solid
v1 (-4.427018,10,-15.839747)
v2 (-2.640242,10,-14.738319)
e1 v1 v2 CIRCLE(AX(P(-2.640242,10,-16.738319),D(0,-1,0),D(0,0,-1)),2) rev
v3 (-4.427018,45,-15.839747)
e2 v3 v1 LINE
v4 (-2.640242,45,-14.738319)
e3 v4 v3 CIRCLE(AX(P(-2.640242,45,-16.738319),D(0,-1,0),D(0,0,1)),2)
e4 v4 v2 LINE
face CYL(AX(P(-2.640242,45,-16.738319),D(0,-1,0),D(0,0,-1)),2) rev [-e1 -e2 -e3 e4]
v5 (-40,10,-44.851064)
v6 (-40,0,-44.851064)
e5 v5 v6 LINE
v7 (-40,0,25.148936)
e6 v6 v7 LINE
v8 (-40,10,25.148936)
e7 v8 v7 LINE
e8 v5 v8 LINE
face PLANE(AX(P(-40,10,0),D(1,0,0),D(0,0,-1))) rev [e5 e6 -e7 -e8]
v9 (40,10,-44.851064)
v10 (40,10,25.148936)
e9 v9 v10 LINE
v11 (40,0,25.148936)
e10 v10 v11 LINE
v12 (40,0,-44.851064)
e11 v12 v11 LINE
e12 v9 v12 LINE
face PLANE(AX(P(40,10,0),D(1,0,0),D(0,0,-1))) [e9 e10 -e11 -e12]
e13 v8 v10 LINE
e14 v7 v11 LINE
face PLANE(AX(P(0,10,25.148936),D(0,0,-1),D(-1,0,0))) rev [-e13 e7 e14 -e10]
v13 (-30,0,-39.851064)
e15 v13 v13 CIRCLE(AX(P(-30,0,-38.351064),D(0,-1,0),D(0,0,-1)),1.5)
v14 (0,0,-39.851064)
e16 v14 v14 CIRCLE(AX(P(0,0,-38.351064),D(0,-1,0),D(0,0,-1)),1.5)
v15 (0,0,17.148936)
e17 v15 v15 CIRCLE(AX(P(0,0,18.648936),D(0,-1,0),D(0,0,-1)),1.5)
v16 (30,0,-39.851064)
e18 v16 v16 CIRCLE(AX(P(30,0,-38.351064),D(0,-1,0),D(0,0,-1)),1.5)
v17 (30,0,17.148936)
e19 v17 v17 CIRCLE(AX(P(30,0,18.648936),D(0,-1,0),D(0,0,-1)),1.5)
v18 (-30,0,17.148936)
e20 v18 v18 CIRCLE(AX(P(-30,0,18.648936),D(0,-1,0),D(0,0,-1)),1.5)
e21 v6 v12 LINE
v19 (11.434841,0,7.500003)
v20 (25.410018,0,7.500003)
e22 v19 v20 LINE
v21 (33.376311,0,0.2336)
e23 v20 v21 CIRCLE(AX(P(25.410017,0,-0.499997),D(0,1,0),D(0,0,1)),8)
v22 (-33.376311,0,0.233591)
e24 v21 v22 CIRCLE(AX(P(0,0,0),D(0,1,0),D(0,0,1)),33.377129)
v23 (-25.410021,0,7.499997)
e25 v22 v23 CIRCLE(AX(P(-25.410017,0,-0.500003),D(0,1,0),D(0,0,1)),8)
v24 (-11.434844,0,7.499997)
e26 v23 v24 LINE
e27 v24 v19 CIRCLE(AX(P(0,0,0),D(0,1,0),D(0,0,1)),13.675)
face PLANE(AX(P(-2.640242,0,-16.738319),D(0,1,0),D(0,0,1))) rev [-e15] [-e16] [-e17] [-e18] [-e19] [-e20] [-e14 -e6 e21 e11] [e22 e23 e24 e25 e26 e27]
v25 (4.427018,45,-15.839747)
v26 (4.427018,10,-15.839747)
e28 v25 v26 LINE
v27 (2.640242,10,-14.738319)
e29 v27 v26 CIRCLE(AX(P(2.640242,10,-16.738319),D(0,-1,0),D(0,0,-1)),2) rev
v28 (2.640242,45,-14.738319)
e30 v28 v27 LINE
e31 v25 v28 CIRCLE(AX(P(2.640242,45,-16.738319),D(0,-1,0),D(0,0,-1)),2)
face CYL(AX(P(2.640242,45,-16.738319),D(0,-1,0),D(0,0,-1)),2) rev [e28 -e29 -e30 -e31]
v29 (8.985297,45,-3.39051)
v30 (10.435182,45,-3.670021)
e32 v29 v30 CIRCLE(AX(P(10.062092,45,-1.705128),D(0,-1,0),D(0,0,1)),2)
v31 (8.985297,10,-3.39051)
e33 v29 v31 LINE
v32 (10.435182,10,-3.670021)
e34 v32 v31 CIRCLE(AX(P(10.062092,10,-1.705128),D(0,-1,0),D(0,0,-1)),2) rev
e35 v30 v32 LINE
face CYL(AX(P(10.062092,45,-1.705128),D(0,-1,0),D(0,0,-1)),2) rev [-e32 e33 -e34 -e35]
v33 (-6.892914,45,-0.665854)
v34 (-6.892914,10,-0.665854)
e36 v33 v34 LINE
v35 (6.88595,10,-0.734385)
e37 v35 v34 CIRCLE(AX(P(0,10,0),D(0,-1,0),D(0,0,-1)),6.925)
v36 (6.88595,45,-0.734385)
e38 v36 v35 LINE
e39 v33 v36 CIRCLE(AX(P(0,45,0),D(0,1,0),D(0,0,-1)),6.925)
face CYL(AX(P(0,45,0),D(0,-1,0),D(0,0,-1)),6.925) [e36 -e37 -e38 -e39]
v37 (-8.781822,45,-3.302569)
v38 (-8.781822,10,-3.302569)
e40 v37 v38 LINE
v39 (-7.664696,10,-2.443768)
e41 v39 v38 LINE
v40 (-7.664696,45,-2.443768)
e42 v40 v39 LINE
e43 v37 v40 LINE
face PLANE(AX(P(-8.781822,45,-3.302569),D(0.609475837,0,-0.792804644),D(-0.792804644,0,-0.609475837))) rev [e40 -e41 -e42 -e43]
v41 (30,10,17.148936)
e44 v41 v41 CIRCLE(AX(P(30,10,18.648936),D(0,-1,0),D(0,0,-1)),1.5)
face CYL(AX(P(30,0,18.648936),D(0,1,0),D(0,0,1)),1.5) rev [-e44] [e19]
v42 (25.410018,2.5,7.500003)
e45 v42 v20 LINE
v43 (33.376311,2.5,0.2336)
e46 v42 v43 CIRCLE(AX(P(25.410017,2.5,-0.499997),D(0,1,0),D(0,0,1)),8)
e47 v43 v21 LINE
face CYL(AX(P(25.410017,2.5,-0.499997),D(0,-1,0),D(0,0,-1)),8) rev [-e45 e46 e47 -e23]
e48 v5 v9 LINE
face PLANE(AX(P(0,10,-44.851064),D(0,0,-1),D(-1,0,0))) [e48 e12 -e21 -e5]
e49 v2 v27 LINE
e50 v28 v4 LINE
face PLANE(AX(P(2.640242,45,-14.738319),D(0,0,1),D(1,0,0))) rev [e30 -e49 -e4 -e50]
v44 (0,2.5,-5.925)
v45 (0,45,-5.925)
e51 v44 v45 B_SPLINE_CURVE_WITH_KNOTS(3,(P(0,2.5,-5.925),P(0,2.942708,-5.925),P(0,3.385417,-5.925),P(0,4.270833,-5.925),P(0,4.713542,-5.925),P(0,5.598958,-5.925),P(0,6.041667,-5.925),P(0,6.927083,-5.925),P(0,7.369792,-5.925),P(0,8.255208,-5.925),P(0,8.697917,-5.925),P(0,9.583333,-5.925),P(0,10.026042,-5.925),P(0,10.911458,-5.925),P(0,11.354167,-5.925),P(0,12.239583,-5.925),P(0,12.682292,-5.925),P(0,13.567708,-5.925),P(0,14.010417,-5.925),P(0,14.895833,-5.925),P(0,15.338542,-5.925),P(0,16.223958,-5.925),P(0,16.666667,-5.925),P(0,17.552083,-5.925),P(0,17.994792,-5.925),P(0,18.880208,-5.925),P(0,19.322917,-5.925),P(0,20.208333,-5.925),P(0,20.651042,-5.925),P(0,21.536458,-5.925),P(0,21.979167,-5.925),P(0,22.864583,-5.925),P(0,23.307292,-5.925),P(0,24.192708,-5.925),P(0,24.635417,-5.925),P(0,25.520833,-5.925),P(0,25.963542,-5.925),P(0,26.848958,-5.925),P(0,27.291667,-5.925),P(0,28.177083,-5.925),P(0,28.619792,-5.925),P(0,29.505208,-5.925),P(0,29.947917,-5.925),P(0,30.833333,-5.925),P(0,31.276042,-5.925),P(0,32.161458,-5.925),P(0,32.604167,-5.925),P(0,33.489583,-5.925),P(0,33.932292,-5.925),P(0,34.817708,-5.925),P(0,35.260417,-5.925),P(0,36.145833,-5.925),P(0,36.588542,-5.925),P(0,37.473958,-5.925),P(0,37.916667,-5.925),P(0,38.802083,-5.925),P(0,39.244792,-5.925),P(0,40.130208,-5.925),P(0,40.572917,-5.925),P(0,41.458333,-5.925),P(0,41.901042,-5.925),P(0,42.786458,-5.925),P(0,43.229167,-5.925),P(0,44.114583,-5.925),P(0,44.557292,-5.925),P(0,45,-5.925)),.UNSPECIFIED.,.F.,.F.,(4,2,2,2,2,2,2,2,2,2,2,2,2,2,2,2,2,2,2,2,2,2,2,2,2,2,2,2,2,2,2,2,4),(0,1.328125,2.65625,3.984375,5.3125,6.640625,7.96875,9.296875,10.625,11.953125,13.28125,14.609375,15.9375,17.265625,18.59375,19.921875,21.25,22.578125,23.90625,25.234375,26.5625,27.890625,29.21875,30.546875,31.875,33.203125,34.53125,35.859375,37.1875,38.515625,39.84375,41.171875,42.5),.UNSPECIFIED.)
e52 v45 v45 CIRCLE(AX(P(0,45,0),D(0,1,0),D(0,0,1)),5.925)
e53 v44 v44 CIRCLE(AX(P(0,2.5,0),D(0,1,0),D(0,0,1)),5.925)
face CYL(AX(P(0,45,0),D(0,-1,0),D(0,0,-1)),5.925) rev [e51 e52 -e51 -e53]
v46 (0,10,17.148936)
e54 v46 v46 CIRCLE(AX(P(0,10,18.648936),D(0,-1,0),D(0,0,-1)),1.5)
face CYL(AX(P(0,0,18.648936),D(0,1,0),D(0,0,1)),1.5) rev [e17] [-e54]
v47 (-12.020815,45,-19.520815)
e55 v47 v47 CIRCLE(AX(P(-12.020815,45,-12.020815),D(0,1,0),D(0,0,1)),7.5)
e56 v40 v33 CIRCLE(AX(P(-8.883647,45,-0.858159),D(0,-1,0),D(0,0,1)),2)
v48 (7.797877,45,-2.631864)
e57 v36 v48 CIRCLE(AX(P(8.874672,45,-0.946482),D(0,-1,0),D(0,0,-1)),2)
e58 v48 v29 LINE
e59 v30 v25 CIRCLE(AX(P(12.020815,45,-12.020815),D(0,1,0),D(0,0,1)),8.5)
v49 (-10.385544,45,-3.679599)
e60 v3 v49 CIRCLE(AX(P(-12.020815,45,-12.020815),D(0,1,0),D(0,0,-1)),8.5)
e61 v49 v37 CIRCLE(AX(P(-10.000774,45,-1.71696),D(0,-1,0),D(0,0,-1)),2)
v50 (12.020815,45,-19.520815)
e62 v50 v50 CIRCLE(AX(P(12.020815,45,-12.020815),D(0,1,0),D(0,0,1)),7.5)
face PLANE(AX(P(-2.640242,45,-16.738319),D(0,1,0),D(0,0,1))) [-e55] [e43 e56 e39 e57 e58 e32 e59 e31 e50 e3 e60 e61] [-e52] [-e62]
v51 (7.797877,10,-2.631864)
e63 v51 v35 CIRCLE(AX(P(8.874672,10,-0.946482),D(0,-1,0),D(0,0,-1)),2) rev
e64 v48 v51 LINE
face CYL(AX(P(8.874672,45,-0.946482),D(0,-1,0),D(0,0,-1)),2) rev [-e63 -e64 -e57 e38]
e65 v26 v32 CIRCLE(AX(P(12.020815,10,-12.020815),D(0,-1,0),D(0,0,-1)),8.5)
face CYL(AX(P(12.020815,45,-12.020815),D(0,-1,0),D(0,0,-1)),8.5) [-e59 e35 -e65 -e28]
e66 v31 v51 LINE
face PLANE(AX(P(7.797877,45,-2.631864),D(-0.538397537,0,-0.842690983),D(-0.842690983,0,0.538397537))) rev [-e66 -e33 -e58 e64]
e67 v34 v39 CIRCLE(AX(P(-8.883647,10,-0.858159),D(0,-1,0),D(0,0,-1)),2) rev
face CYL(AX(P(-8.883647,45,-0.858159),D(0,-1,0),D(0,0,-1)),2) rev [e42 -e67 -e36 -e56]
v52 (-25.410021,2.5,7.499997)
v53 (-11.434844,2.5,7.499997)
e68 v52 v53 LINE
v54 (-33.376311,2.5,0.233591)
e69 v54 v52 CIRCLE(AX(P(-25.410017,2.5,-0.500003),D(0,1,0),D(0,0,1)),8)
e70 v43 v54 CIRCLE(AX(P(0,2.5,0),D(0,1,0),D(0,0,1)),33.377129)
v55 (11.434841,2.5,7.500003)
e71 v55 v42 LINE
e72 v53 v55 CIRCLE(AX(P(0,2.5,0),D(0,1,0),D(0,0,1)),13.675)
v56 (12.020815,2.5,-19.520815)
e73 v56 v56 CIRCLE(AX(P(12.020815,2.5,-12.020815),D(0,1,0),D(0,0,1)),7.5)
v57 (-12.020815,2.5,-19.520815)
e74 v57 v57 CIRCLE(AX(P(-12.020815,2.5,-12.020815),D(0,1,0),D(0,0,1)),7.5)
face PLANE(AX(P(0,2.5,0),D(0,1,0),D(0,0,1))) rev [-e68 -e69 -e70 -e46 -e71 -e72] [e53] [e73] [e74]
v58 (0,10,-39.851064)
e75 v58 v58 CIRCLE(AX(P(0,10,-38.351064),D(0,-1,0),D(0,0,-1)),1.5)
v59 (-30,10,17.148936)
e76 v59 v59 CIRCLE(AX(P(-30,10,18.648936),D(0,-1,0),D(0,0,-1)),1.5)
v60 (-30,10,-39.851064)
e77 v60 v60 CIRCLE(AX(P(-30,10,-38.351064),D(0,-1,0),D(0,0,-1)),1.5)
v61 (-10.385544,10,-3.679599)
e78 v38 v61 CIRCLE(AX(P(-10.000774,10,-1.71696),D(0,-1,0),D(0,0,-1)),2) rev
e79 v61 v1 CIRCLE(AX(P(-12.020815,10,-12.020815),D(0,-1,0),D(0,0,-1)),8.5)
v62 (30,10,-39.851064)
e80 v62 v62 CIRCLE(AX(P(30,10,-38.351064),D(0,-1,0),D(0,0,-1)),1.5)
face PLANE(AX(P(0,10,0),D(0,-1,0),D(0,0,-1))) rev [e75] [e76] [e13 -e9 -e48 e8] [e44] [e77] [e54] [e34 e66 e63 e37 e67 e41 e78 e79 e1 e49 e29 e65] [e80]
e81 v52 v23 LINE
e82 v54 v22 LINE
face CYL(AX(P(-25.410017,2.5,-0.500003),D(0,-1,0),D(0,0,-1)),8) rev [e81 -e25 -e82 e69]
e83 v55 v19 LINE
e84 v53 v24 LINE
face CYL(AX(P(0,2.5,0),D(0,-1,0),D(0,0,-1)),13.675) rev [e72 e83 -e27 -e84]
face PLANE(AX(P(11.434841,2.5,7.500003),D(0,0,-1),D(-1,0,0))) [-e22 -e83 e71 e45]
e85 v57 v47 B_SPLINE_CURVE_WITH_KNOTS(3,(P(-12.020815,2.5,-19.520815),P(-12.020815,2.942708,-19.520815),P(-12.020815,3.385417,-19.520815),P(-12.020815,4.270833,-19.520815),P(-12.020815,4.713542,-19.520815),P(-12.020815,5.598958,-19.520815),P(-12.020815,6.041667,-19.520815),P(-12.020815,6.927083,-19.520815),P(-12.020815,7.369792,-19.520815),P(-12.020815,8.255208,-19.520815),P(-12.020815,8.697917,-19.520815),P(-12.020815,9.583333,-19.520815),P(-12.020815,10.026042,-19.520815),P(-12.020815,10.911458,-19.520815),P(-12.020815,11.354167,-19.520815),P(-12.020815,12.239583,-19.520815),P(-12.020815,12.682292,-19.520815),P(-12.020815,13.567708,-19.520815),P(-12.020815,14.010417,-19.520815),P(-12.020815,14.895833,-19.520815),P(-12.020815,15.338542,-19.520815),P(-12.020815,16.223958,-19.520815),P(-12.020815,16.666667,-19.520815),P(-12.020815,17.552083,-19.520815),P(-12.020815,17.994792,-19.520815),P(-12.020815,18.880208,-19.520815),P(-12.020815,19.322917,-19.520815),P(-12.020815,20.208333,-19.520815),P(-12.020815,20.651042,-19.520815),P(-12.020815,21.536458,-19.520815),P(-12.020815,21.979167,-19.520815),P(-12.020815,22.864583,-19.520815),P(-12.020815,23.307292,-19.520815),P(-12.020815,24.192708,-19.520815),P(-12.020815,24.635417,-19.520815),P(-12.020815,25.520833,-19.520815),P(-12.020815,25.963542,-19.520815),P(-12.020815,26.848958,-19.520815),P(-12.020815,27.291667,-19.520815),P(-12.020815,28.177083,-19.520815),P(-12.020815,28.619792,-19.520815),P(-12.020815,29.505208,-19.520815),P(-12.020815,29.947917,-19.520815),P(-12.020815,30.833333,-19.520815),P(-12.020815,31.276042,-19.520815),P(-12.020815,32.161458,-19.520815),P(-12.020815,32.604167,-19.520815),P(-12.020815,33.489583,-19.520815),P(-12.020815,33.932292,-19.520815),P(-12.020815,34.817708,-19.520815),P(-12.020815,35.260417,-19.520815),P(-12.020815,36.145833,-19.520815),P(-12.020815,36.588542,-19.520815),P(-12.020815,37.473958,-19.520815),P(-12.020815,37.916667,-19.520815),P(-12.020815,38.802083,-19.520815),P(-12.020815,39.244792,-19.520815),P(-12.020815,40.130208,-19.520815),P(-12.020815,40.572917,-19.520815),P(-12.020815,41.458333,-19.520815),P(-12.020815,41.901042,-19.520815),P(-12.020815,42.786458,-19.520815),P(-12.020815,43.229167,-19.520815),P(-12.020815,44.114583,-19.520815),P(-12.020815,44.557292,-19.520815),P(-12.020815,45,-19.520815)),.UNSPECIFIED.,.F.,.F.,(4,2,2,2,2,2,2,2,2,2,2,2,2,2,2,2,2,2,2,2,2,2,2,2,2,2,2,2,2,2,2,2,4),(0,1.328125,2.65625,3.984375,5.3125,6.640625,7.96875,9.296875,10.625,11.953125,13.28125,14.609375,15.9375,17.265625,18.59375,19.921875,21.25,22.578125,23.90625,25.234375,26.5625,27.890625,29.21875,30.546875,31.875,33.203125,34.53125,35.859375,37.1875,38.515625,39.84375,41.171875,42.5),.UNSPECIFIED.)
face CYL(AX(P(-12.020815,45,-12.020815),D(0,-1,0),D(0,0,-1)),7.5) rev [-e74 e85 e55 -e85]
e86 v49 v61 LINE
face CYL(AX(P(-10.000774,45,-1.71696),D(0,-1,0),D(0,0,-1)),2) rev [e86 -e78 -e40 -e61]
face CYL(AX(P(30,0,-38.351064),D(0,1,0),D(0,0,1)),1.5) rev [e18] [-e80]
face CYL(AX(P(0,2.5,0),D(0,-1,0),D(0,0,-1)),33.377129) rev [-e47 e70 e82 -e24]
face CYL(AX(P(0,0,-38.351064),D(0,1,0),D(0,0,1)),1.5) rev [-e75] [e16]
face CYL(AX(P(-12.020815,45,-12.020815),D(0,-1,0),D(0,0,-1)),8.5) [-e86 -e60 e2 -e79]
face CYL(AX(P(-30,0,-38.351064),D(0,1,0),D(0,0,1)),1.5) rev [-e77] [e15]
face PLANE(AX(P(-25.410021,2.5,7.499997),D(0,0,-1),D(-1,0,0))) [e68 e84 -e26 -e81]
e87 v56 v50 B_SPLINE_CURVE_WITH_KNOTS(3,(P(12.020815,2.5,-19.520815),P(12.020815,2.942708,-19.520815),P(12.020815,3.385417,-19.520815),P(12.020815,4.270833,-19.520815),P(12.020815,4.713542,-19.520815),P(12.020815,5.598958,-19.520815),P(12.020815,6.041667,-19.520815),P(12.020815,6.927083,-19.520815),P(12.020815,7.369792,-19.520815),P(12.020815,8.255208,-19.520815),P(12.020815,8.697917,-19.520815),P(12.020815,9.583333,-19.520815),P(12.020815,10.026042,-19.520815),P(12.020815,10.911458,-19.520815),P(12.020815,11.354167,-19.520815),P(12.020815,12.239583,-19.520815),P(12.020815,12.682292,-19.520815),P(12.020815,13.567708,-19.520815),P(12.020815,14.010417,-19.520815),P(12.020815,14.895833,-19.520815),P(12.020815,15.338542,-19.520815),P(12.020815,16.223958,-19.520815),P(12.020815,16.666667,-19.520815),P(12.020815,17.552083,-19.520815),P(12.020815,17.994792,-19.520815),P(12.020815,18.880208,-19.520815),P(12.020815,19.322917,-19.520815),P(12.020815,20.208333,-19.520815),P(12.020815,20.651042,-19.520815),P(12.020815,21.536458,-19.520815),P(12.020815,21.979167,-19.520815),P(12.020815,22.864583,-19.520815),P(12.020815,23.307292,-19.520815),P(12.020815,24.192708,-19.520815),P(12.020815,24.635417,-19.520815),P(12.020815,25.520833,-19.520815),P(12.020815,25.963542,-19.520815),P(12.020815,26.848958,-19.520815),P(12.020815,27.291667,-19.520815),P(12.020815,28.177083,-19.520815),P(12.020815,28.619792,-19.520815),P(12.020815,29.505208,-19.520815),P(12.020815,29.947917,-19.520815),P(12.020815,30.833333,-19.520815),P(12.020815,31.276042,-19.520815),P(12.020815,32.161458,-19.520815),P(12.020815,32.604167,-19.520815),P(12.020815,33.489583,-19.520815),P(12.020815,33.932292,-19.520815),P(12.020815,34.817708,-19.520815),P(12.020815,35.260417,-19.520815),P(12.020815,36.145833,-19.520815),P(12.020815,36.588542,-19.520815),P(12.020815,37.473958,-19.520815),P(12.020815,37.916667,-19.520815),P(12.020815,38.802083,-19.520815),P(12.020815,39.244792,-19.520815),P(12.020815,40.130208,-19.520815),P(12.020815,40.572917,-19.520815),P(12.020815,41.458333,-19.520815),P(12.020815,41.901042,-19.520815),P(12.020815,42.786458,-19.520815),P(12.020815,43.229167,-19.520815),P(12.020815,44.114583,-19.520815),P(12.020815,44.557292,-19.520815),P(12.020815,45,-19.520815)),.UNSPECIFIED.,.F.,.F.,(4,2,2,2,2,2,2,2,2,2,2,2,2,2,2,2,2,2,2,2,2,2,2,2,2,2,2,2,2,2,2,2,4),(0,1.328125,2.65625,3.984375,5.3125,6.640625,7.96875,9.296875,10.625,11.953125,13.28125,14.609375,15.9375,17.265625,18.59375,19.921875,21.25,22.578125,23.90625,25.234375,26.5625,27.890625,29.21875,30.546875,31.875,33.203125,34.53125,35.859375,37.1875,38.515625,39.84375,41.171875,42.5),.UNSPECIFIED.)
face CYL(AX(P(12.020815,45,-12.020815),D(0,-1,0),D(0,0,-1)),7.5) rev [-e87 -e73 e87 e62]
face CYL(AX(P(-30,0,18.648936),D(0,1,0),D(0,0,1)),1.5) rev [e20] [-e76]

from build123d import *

# Parameters (mm, degrees)
BOSS_EXTRUDE1_OUTLINE_R   = 5.925
BOSS_EXTRUDE1_OUTLINE_R_2 = 7.5
BOSS_EXTRUDE1_DEPTH       = 45
SKETCH7_W                 = 80
SKETCH7_H                 = 70
BOSS_EXTRUDE2_DEPTH       = 10
SKETCH9_R                 = 1.5
SKETCH9_R_2               = 7.5
SKETCH9_R_3               = 5.925
CUT_EXTRUDE1_DEPTH        = 70.545797618
CUT_EXTRUDE2_DEPTH        = 2.5


# Read off the part's stored shape, not the designer's step: Boss-Extrude1
with BuildPart() as part:
    # Boss-Extrude1 outline → Boss-Extrude1 (new body)
    with BuildSketch(Plane(origin=(0, 0, 0), x_dir=(1, 0, 0), z_dir=(0, 1, 0))):
        with BuildLine():
            Line((2.640241809, 14.738319), (-2.640241809, 14.738319))
            ThreePointArc((-2.640241809, 14.738319), (-3.689731143, 15.03579965), (-4.427017708, 15.839746863))
            ThreePointArc((-4.427017708, 15.839746863), (-19.653719539, 15.760972037), (-10.385543741, 3.679599122))
            ThreePointArc((-10.385543741, 3.679599122), (-9.543059286, 3.663879971), (-8.781822294, 3.302569315))
            Line((-8.781822294, 3.302569315), (-7.664695593, 2.443767924))
            ThreePointArc((-7.664695593, 2.443767924), (-7.049045485, 1.654548176), (-6.892913986, 0.665854179))
            ThreePointArc((-6.892913986, 0.665854179), (0.034441884, -6.92491435), (6.88594973, 0.734384995))
            ThreePointArc((6.88594973, 0.734384995), (7.072047194, 1.812821739), (7.797876599, 2.63186371))
            Line((7.797876599, 2.63186371), (8.985297239, 3.390509952))
            ThreePointArc((8.985297239, 3.390509952), (9.683500506, 3.668968165), (10.435182401, 3.670020805))
            ThreePointArc((10.435182401, 3.670020805), (19.642563369, 15.783654111), (4.427017708, 15.839746863))
            ThreePointArc((4.427017708, 15.839746863), (3.689731143, 15.03579965), (2.640241809, 14.738319))
        make_face()
        Circle(BOSS_EXTRUDE1_OUTLINE_R, mode=Mode.SUBTRACT)
        with Locations((-12.02081528, 12.02081528)):
            Circle(BOSS_EXTRUDE1_OUTLINE_R_2, mode=Mode.SUBTRACT)
        with Locations((12.02081528, 12.02081528)):
            Circle(BOSS_EXTRUDE1_OUTLINE_R_2, mode=Mode.SUBTRACT)
    extrude(amount=BOSS_EXTRUDE1_DEPTH)

    # Sketch7 → Boss-Extrude2 (add)
    # profile 1 of 2: a face of its own
    with BuildSketch(Plane.XZ):
        with Locations((0, -9.851064271)):
            Rectangle(SKETCH7_W, SKETCH7_H)
        with BuildLine():
            ThreePointArc((6.88594973, -0.734384995), (7.072047194, -1.812821739), (7.797876599, -2.63186371))
            Line((7.797876599, -2.63186371), (8.985297239, -3.390509952))
            ThreePointArc((8.985297239, -3.390509952), (9.683500506, -3.668968165), (10.435182401, -3.670020805))
            ThreePointArc((10.435182401, -3.670020805), (19.642563369, -15.783654111), (4.427017708, -15.839746863))
            ThreePointArc((4.427017708, -15.839746863), (3.689731143, -15.03579965), (2.640241809, -14.738319))
            Line((2.640241809, -14.738319), (-2.640241809, -14.738319))
            ThreePointArc((-2.640241809, -14.738319), (-3.689731143, -15.03579965), (-4.427017708, -15.839746863))
            ThreePointArc((-4.427017708, -15.839746863), (-19.653719539, -15.760972037), (-10.385543741, -3.679599122))
            ThreePointArc((-10.385543741, -3.679599122), (-9.543059286, -3.663879971), (-8.781822294, -3.302569315))
            Line((-8.781822294, -3.302569315), (-7.664695593, -2.443767924))
            ThreePointArc((-7.664695593, -2.443767924), (-7.049045485, -1.654548176), (-6.892913986, -0.665854179))
            ThreePointArc((-6.892913986, -0.665854179), (0.034441884, 6.92491435), (6.88594973, -0.734384995))
        make_face(mode=Mode.SUBTRACT)
    # profile 2 of 2: a face of its own
    with BuildSketch(Plane.XZ):
        with Locations((0, -9.851064271)):
            Rectangle(SKETCH7_W, SKETCH7_H)
        with BuildLine():
            ThreePointArc((6.88594973, -0.734384995), (7.072047194, -1.812821739), (7.797876599, -2.63186371))
            Line((7.797876599, -2.63186371), (8.985297239, -3.390509952))
            ThreePointArc((8.985297239, -3.390509952), (9.683500506, -3.668968165), (10.435182401, -3.670020805))
            ThreePointArc((10.435182401, -3.670020805), (19.642563369, -15.783654111), (4.427017708, -15.839746863))
            ThreePointArc((4.427017708, -15.839746863), (3.689731143, -15.03579965), (2.640241809, -14.738319))
            Line((2.640241809, -14.738319), (-2.640241809, -14.738319))
            ThreePointArc((-2.640241809, -14.738319), (-3.689731143, -15.03579965), (-4.427017708, -15.839746863))
            ThreePointArc((-4.427017708, -15.839746863), (-19.653719539, -15.760972037), (-10.385543741, -3.679599122))
            ThreePointArc((-10.385543741, -3.679599122), (-9.543059286, -3.663879971), (-8.781822294, -3.302569315))
            Line((-8.781822294, -3.302569315), (-7.664695593, -2.443767924))
            ThreePointArc((-7.664695593, -2.443767924), (-7.049045485, -1.654548176), (-6.892913986, -0.665854179))
            ThreePointArc((-6.892913986, -0.665854179), (0.034441884, 6.92491435), (6.88594973, -0.734384995))
        make_face(mode=Mode.SUBTRACT)
    extrude(amount=-BOSS_EXTRUDE2_DEPTH)

    # Sketch9 → Cut-Extrude1 (cut, through all)
    with BuildSketch(Plane(origin=(0, 10, 0), x_dir=(-1, 0, 0), z_dir=(0, -1, 0))):
        with Locations(Location((-30, 38.351064271, 0), (0, 0, 90))):
            Circle(SKETCH9_R)
        with Locations(Location((-30, -18.648935729, 0), (0, 0, 90))):
            Circle(SKETCH9_R)
        with Locations(Location((0, -18.648935729, 0), (0, 0, 90))):
            Circle(SKETCH9_R)
        with Locations(Location((30, -18.648935729, 0), (0, 0, 90))):
            Circle(SKETCH9_R)
        with Locations(Location((30, 38.351064271, 0), (0, 0, 90))):
            Circle(SKETCH9_R)
        with Locations(Location((0, 38.351064271, 0), (0, 0, 90))):
            Circle(SKETCH9_R)
        with Locations(Location((-12.02081528, 12.02081528, 0), (0, 0, 90))):
            Circle(SKETCH9_R_2)
        with Locations(Location((12.02081528, 12.02081528, 0), (0, 0, 90))):
            Circle(SKETCH9_R_2)
        with Locations(Location((0, 0, 0), (0, 0, 90))):
            Circle(SKETCH9_R_3)
    extrude(amount=CUT_EXTRUDE1_DEPTH, mode=Mode.SUBTRACT)

    # Sketch10 → Cut-Extrude2 (cut)
    with BuildSketch(Plane(origin=(0, 0, 0), x_dir=(-1, 0, 0), z_dir=(0, 1, 0))):
        with BuildLine():
            Line((-11.434840744, 7.500002811), (-25.410017566, 7.500002811))
            ThreePointArc((-25.410017566, 7.500002811), (-30.80127054, 5.410534914), (-33.376311069, 0.233600397))
            ThreePointArc((-33.376311069, 0.233600397), (-4.816e-06, -33.377128543), (33.376311137, 0.233590765))
            ThreePointArc((33.376311137, 0.233590765), (30.801273238, 5.410526556), (25.410021357, 7.499997189))
            Line((25.410021357, 7.499997189), (11.434844431, 7.499997189))
            ThreePointArc((11.434844431, 7.499997189), (3.362e-06, 13.675), (-11.434840744, 7.500002811))
        make_face()
    extrude(amount=CUT_EXTRUDE2_DEPTH, mode=Mode.SUBTRACT)


solid = part.part
